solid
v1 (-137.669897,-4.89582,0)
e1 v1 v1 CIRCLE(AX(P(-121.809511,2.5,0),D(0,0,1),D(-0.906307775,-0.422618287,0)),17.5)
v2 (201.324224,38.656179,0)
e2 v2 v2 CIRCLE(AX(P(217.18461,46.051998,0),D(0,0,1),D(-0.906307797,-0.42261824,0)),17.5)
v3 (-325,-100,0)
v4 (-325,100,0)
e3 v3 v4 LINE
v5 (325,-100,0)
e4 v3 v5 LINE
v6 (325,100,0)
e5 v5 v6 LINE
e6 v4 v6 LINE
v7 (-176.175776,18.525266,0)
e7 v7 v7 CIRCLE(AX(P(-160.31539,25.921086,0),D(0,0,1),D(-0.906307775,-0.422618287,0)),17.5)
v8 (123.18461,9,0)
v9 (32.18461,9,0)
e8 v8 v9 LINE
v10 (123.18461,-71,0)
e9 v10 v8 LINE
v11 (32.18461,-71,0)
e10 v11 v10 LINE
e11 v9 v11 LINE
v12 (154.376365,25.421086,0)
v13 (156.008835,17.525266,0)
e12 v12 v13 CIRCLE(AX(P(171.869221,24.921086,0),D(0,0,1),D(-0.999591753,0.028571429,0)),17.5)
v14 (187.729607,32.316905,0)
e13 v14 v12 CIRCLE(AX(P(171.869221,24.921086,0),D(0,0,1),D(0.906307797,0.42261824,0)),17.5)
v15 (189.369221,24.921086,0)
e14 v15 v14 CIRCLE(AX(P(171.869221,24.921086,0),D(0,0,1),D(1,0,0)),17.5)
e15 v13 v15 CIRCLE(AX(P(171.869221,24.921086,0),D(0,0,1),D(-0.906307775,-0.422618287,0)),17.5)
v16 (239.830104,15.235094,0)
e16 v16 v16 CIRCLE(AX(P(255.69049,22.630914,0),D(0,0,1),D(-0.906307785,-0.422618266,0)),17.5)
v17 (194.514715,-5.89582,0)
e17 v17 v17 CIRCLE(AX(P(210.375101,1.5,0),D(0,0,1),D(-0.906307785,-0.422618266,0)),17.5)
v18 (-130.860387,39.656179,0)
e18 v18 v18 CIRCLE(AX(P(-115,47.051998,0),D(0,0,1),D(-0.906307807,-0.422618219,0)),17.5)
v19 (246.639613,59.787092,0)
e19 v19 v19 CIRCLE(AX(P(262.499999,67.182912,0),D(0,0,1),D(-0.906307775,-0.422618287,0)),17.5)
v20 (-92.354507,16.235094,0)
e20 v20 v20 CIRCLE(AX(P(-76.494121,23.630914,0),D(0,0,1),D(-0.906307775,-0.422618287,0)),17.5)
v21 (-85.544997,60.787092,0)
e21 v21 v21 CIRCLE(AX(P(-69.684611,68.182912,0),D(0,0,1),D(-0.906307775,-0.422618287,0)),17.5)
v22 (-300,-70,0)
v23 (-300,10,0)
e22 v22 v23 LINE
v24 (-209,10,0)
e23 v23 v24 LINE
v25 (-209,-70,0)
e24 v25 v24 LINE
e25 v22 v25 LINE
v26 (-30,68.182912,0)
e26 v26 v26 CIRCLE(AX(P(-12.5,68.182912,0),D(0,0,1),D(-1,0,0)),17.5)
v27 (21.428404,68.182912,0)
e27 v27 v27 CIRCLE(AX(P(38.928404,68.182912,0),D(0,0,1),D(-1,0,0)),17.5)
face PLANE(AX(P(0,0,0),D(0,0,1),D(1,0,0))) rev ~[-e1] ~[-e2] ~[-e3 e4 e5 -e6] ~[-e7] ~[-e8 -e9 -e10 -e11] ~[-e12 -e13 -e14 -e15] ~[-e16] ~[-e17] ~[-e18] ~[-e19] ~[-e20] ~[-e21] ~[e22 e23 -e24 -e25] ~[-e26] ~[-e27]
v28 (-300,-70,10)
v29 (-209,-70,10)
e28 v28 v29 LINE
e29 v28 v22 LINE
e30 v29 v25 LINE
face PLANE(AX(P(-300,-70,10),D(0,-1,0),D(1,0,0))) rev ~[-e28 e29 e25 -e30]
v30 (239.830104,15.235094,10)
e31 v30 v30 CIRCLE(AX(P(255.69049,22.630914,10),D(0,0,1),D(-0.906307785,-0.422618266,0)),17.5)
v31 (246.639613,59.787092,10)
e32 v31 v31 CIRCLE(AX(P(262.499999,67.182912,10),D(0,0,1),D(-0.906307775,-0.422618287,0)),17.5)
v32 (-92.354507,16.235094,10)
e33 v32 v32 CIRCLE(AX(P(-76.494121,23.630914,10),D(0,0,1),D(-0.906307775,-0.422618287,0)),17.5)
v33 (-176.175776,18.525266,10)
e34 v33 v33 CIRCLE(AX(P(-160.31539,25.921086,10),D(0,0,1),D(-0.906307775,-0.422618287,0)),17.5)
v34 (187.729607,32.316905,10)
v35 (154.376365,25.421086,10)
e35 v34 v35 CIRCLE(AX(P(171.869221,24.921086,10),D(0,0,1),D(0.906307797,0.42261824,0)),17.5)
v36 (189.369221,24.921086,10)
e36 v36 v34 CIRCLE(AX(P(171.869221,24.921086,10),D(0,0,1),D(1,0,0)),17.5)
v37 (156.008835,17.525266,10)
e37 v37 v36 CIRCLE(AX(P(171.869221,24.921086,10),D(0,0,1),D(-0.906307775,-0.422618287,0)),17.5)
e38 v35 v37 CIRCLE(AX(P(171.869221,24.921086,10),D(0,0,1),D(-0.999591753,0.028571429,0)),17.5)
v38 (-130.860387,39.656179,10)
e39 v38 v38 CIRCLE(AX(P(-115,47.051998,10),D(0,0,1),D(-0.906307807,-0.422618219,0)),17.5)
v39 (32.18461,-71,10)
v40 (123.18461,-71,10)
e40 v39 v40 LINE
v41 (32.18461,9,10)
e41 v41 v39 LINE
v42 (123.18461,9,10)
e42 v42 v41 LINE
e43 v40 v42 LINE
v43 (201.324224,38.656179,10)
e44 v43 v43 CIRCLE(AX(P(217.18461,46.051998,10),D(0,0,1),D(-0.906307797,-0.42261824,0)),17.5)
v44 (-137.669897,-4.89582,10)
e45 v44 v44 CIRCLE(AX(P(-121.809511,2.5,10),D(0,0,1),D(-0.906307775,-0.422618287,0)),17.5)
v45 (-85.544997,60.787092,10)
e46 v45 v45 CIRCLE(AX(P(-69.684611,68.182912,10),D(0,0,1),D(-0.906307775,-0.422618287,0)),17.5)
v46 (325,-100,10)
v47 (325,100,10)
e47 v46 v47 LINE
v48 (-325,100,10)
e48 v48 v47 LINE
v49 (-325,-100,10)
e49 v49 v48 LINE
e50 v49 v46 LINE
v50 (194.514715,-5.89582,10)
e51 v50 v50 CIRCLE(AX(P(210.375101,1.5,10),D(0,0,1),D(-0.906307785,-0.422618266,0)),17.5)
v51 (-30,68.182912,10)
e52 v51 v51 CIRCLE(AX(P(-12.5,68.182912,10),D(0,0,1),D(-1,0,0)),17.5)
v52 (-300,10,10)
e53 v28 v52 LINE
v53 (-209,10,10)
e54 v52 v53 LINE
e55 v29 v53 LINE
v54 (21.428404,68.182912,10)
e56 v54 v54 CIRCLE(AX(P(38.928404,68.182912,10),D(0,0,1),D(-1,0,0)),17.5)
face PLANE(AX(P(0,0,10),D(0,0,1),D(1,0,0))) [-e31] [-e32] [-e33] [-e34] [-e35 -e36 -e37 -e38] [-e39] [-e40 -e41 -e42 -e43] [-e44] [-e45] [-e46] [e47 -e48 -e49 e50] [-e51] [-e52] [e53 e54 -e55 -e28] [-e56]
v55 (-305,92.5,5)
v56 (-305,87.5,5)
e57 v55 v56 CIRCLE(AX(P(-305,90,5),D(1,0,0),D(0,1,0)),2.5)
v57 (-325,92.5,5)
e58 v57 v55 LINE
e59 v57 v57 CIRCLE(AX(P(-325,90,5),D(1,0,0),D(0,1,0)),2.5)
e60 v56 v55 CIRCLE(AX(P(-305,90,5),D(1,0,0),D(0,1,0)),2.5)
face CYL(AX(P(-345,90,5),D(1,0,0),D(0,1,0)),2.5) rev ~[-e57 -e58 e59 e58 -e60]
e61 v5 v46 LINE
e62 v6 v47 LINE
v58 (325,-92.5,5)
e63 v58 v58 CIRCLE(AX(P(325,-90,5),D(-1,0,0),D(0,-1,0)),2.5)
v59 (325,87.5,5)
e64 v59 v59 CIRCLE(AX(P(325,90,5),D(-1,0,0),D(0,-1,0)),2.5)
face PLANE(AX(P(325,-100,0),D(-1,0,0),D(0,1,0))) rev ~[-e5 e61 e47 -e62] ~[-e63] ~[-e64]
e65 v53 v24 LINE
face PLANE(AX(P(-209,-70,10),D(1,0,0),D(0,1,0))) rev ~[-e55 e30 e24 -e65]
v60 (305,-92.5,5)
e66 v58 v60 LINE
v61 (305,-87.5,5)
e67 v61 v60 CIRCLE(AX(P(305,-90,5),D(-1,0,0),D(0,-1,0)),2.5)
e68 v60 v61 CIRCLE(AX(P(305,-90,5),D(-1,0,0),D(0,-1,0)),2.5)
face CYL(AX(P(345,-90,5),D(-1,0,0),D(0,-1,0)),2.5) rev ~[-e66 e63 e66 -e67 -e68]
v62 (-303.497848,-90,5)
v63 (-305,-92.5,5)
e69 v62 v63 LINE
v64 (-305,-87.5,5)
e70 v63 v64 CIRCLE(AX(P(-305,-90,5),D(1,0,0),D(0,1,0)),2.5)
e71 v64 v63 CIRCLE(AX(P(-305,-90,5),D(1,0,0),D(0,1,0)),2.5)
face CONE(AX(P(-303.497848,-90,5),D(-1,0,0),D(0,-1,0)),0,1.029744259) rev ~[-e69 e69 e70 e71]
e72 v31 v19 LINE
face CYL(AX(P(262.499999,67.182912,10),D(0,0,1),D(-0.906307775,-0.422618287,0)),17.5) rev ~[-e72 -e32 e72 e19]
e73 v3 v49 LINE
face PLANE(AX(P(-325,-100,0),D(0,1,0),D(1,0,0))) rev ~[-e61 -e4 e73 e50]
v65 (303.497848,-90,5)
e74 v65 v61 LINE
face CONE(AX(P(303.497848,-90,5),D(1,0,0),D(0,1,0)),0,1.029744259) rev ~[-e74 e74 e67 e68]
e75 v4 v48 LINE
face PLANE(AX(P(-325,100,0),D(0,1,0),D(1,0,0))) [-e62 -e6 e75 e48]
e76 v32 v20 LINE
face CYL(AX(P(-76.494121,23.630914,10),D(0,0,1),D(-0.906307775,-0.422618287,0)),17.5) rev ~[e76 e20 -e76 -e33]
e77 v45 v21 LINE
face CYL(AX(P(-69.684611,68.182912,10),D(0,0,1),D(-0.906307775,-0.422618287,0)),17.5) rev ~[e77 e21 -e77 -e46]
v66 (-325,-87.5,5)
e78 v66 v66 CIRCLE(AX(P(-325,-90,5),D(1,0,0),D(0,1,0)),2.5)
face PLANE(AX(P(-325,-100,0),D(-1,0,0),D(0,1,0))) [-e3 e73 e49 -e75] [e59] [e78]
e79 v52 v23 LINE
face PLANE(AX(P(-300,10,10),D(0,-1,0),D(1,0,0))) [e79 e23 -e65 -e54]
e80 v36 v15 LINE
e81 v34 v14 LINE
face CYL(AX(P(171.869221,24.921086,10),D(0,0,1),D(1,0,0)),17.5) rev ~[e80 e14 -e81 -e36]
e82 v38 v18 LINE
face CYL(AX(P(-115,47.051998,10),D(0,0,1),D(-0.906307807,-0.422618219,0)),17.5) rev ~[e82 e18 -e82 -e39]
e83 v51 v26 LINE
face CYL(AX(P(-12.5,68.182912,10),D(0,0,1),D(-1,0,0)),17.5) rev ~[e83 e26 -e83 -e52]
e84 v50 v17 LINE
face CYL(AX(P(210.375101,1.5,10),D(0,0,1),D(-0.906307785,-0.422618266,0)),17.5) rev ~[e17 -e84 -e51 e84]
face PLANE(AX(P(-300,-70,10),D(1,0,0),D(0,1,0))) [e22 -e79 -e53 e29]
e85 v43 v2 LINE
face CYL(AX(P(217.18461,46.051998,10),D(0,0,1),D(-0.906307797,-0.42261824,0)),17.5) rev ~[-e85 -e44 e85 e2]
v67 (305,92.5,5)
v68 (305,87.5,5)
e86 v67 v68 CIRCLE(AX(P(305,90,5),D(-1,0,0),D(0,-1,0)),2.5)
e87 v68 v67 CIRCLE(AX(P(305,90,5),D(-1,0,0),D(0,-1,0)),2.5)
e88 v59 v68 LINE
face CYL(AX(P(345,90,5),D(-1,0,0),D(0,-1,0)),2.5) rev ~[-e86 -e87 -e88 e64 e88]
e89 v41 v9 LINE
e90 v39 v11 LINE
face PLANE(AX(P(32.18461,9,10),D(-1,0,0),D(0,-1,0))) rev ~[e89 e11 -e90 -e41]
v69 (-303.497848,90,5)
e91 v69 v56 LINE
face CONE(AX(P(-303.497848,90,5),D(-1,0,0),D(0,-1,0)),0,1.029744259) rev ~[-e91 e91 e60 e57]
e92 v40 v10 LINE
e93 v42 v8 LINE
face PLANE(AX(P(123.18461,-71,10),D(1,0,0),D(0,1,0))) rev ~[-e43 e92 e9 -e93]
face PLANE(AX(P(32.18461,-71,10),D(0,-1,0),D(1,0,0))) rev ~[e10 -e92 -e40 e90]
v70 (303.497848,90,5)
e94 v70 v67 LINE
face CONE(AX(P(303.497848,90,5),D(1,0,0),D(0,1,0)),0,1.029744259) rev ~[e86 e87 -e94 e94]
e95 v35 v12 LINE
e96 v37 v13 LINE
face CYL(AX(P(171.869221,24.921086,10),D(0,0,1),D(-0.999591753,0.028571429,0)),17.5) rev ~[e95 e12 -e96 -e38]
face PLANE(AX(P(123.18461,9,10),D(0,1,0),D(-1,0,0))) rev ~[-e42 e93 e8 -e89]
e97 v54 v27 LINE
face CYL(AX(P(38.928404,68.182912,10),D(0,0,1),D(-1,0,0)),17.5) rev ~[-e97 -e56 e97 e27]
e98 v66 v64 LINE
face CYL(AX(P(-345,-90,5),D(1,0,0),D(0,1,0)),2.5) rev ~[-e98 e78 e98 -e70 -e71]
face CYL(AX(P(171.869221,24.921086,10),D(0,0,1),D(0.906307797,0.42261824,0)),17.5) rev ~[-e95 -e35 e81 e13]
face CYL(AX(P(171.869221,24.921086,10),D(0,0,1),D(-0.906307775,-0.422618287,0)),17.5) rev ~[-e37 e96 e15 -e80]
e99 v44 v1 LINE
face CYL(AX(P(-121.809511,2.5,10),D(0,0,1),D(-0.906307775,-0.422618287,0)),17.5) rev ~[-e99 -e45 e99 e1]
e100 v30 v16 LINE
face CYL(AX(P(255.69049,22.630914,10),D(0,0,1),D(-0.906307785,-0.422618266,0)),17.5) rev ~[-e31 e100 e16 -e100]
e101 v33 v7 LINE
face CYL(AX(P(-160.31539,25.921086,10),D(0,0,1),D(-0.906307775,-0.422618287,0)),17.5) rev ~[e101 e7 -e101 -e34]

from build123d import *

# Parameters (mm, degrees)
F0_W           = 650
F0_H           = 200
F1_DEPTH       = 10
F4_D           = 5
F4_DEPTH       = 20
F4_TIP         = 1.5021515476
F4_ON_F3_D     = 5
F4_ON_F3_DEPTH = 20
F4_ON_F3_TIP   = 1.5021515476
F5_W           = 91
F5_H           = 80
F6_DEPTH       = 25


with BuildPart() as f1:
    # F0 (on Top) → F1 (new body)
    with BuildSketch(Plane.XY):
        Rectangle(F0_W, F0_H)
    extrude(amount=F1_DEPTH)

    # F4
    with Locations(Plane.YZ.offset(325)):
        with Locations((90, 5), (-90, 5)):
            Hole(F4_D / 2, depth=F4_DEPTH)
            with Locations((0, 0, -(F4_DEPTH + F4_TIP / 2))):  # 118° drill point
                Cone(0, F4_D / 2, F4_TIP, mode=Mode.SUBTRACT)

    # F4 on F3
    with Locations(Plane(origin=(-325, 0, 0), x_dir=(0, -1, 0), z_dir=(-1, 0, 0))):
        with Locations((90, 5), (-90, 5)):
            Hole(F4_ON_F3_D / 2, depth=F4_ON_F3_DEPTH)
            with Locations((0, 0, -(F4_ON_F3_DEPTH + F4_ON_F3_TIP / 2))):  # 118° drill point
                Cone(0, F4_ON_F3_D / 2, F4_ON_F3_TIP, mode=Mode.SUBTRACT)

    # F5 (on face) → F6 (cut)
    with BuildSketch(Plane.XY.offset(10)):
        with BuildLine():
            ThreePointArc((-144.4550033747, 33.3169048253), (-167.7112094275, 41.7814723445), (-176.1757760637, 18.5252659703))
            ThreePointArc((-176.1757760637, 18.5252659703), (-152.9195705725, 10.0606996555), (-144.4550033747, 33.3169048253))
        make_face()
        with BuildLine():
            ThreePointArc((-99.1396139363, 54.4478180297), (-122.3958194275, 62.9123843445), (-130.8603866253, 39.6561791747))
            ThreePointArc((-130.8603866253, 39.6561791747), (-107.6041805725, 31.1916116555), (-99.1396139363, 54.4478180297))
        make_face()
        with BuildLine():
            ThreePointArc((-60.6337345533, 31.0267332083), (-83.889940619, 39.4913002552), (-92.3545070637, 16.2350939703))
            ThreePointArc((-92.3545070637, 16.2350939703), (-69.098301381, 7.7705277448), (-60.6337345533, 31.0267332083))
        make_face()
        with BuildLine():
            ThreePointArc((-105.9491247577, 9.8958196467), (-129.2053308382, 18.360386153), (-137.6698970637, -4.8958200297))
            ThreePointArc((-137.6698970637, -4.8958200297), (-114.4136911618, -13.360386153), (-105.9491247577, 9.8958196467))
        make_face()
        with BuildLine():
            ThreePointArc((-53.8242245533, 75.5787312083), (-77.080430619, 84.0432982552), (-85.5449970637, 60.7870919703))
            ThreePointArc((-85.5449970637, 60.7870919703), (-62.288791381, 52.3225257448), (-53.8242245533, 75.5787312083))
        make_face()
        with Locations((-254.5, -30)):
            Rectangle(F5_W, F5_H)
        with BuildLine():
            ThreePointArc((189.369221, 24.921086), (188.954401169, 28.7087790435), (187.7296074467, 32.3169052083))
            ThreePointArc((187.7296074467, 32.3169052083), (168.3260134713, 42.0586377624), (154.3763653155, 25.421086))
            ThreePointArc((154.3763653155, 25.421086), (154.7316693294, 21.3778780275), (156.0088349363, 17.5252659703))
            ThreePointArc((156.0088349363, 17.5252659703), (175.6569144859, 7.835905929), (189.369221, 24.921086))
        make_face()
        with BuildLine():
            ThreePointArc((233.0449962423, 53.4478176467), (209.7887905725, 61.9123843445), (201.3242235533, 38.6561787917))
            ThreePointArc((201.3242235533, 38.6561787917), (224.5804294275, 30.1916116555), (233.0449962423, 53.4478176467))
        make_face()
        with BuildLine():
            ThreePointArc((271.5508764467, 30.0267332083), (248.2946705725, 38.4913003445), (239.8301037577, 15.2350943533))
            ThreePointArc((239.8301037577, 15.2350943533), (263.0863094275, 6.7705276555), (271.5508764467, 30.0267332083))
        make_face()
        with BuildLine():
            ThreePointArc((226.2354870637, 8.8958200297), (202.9792811618, 17.360386153), (194.5147147577, -5.8958196467))
            ThreePointArc((194.5147147577, -5.8958196467), (217.7709208382, -14.360386153), (226.2354870637, 8.8958200297))
        make_face()
        with BuildLine():
            ThreePointArc((278.3603856253, 74.5787308253), (255.1041795725, 83.0432983445), (246.6396129363, 59.7870919703))
            ThreePointArc((246.6396129363, 59.7870919703), (269.8958184275, 51.3225256555), (278.3603856253, 74.5787308253))
        make_face()
        Polygon((32.18461, -70), (32.18461, -71), (123.18461, -71), (123.18461, -70), (123.18461, 9), (32.18461, 9), align=None)
        with BuildLine():
            ThreePointArc((5, 68.182912), (-12.5, 85.682912), (-30, 68.182912))
            ThreePointArc((-30, 68.182912), (-12.5, 50.682912), (5, 68.182912))
        make_face()
        with BuildLine():
            ThreePointArc((56.428404, 68.182912), (38.928404, 85.682912), (21.428404, 68.182912))
            ThreePointArc((21.428404, 68.182912), (38.928404, 50.682912), (56.428404, 68.182912))
        make_face()
    extrude(amount=-F6_DEPTH, mode=Mode.SUBTRACT)


solid = f1.part
